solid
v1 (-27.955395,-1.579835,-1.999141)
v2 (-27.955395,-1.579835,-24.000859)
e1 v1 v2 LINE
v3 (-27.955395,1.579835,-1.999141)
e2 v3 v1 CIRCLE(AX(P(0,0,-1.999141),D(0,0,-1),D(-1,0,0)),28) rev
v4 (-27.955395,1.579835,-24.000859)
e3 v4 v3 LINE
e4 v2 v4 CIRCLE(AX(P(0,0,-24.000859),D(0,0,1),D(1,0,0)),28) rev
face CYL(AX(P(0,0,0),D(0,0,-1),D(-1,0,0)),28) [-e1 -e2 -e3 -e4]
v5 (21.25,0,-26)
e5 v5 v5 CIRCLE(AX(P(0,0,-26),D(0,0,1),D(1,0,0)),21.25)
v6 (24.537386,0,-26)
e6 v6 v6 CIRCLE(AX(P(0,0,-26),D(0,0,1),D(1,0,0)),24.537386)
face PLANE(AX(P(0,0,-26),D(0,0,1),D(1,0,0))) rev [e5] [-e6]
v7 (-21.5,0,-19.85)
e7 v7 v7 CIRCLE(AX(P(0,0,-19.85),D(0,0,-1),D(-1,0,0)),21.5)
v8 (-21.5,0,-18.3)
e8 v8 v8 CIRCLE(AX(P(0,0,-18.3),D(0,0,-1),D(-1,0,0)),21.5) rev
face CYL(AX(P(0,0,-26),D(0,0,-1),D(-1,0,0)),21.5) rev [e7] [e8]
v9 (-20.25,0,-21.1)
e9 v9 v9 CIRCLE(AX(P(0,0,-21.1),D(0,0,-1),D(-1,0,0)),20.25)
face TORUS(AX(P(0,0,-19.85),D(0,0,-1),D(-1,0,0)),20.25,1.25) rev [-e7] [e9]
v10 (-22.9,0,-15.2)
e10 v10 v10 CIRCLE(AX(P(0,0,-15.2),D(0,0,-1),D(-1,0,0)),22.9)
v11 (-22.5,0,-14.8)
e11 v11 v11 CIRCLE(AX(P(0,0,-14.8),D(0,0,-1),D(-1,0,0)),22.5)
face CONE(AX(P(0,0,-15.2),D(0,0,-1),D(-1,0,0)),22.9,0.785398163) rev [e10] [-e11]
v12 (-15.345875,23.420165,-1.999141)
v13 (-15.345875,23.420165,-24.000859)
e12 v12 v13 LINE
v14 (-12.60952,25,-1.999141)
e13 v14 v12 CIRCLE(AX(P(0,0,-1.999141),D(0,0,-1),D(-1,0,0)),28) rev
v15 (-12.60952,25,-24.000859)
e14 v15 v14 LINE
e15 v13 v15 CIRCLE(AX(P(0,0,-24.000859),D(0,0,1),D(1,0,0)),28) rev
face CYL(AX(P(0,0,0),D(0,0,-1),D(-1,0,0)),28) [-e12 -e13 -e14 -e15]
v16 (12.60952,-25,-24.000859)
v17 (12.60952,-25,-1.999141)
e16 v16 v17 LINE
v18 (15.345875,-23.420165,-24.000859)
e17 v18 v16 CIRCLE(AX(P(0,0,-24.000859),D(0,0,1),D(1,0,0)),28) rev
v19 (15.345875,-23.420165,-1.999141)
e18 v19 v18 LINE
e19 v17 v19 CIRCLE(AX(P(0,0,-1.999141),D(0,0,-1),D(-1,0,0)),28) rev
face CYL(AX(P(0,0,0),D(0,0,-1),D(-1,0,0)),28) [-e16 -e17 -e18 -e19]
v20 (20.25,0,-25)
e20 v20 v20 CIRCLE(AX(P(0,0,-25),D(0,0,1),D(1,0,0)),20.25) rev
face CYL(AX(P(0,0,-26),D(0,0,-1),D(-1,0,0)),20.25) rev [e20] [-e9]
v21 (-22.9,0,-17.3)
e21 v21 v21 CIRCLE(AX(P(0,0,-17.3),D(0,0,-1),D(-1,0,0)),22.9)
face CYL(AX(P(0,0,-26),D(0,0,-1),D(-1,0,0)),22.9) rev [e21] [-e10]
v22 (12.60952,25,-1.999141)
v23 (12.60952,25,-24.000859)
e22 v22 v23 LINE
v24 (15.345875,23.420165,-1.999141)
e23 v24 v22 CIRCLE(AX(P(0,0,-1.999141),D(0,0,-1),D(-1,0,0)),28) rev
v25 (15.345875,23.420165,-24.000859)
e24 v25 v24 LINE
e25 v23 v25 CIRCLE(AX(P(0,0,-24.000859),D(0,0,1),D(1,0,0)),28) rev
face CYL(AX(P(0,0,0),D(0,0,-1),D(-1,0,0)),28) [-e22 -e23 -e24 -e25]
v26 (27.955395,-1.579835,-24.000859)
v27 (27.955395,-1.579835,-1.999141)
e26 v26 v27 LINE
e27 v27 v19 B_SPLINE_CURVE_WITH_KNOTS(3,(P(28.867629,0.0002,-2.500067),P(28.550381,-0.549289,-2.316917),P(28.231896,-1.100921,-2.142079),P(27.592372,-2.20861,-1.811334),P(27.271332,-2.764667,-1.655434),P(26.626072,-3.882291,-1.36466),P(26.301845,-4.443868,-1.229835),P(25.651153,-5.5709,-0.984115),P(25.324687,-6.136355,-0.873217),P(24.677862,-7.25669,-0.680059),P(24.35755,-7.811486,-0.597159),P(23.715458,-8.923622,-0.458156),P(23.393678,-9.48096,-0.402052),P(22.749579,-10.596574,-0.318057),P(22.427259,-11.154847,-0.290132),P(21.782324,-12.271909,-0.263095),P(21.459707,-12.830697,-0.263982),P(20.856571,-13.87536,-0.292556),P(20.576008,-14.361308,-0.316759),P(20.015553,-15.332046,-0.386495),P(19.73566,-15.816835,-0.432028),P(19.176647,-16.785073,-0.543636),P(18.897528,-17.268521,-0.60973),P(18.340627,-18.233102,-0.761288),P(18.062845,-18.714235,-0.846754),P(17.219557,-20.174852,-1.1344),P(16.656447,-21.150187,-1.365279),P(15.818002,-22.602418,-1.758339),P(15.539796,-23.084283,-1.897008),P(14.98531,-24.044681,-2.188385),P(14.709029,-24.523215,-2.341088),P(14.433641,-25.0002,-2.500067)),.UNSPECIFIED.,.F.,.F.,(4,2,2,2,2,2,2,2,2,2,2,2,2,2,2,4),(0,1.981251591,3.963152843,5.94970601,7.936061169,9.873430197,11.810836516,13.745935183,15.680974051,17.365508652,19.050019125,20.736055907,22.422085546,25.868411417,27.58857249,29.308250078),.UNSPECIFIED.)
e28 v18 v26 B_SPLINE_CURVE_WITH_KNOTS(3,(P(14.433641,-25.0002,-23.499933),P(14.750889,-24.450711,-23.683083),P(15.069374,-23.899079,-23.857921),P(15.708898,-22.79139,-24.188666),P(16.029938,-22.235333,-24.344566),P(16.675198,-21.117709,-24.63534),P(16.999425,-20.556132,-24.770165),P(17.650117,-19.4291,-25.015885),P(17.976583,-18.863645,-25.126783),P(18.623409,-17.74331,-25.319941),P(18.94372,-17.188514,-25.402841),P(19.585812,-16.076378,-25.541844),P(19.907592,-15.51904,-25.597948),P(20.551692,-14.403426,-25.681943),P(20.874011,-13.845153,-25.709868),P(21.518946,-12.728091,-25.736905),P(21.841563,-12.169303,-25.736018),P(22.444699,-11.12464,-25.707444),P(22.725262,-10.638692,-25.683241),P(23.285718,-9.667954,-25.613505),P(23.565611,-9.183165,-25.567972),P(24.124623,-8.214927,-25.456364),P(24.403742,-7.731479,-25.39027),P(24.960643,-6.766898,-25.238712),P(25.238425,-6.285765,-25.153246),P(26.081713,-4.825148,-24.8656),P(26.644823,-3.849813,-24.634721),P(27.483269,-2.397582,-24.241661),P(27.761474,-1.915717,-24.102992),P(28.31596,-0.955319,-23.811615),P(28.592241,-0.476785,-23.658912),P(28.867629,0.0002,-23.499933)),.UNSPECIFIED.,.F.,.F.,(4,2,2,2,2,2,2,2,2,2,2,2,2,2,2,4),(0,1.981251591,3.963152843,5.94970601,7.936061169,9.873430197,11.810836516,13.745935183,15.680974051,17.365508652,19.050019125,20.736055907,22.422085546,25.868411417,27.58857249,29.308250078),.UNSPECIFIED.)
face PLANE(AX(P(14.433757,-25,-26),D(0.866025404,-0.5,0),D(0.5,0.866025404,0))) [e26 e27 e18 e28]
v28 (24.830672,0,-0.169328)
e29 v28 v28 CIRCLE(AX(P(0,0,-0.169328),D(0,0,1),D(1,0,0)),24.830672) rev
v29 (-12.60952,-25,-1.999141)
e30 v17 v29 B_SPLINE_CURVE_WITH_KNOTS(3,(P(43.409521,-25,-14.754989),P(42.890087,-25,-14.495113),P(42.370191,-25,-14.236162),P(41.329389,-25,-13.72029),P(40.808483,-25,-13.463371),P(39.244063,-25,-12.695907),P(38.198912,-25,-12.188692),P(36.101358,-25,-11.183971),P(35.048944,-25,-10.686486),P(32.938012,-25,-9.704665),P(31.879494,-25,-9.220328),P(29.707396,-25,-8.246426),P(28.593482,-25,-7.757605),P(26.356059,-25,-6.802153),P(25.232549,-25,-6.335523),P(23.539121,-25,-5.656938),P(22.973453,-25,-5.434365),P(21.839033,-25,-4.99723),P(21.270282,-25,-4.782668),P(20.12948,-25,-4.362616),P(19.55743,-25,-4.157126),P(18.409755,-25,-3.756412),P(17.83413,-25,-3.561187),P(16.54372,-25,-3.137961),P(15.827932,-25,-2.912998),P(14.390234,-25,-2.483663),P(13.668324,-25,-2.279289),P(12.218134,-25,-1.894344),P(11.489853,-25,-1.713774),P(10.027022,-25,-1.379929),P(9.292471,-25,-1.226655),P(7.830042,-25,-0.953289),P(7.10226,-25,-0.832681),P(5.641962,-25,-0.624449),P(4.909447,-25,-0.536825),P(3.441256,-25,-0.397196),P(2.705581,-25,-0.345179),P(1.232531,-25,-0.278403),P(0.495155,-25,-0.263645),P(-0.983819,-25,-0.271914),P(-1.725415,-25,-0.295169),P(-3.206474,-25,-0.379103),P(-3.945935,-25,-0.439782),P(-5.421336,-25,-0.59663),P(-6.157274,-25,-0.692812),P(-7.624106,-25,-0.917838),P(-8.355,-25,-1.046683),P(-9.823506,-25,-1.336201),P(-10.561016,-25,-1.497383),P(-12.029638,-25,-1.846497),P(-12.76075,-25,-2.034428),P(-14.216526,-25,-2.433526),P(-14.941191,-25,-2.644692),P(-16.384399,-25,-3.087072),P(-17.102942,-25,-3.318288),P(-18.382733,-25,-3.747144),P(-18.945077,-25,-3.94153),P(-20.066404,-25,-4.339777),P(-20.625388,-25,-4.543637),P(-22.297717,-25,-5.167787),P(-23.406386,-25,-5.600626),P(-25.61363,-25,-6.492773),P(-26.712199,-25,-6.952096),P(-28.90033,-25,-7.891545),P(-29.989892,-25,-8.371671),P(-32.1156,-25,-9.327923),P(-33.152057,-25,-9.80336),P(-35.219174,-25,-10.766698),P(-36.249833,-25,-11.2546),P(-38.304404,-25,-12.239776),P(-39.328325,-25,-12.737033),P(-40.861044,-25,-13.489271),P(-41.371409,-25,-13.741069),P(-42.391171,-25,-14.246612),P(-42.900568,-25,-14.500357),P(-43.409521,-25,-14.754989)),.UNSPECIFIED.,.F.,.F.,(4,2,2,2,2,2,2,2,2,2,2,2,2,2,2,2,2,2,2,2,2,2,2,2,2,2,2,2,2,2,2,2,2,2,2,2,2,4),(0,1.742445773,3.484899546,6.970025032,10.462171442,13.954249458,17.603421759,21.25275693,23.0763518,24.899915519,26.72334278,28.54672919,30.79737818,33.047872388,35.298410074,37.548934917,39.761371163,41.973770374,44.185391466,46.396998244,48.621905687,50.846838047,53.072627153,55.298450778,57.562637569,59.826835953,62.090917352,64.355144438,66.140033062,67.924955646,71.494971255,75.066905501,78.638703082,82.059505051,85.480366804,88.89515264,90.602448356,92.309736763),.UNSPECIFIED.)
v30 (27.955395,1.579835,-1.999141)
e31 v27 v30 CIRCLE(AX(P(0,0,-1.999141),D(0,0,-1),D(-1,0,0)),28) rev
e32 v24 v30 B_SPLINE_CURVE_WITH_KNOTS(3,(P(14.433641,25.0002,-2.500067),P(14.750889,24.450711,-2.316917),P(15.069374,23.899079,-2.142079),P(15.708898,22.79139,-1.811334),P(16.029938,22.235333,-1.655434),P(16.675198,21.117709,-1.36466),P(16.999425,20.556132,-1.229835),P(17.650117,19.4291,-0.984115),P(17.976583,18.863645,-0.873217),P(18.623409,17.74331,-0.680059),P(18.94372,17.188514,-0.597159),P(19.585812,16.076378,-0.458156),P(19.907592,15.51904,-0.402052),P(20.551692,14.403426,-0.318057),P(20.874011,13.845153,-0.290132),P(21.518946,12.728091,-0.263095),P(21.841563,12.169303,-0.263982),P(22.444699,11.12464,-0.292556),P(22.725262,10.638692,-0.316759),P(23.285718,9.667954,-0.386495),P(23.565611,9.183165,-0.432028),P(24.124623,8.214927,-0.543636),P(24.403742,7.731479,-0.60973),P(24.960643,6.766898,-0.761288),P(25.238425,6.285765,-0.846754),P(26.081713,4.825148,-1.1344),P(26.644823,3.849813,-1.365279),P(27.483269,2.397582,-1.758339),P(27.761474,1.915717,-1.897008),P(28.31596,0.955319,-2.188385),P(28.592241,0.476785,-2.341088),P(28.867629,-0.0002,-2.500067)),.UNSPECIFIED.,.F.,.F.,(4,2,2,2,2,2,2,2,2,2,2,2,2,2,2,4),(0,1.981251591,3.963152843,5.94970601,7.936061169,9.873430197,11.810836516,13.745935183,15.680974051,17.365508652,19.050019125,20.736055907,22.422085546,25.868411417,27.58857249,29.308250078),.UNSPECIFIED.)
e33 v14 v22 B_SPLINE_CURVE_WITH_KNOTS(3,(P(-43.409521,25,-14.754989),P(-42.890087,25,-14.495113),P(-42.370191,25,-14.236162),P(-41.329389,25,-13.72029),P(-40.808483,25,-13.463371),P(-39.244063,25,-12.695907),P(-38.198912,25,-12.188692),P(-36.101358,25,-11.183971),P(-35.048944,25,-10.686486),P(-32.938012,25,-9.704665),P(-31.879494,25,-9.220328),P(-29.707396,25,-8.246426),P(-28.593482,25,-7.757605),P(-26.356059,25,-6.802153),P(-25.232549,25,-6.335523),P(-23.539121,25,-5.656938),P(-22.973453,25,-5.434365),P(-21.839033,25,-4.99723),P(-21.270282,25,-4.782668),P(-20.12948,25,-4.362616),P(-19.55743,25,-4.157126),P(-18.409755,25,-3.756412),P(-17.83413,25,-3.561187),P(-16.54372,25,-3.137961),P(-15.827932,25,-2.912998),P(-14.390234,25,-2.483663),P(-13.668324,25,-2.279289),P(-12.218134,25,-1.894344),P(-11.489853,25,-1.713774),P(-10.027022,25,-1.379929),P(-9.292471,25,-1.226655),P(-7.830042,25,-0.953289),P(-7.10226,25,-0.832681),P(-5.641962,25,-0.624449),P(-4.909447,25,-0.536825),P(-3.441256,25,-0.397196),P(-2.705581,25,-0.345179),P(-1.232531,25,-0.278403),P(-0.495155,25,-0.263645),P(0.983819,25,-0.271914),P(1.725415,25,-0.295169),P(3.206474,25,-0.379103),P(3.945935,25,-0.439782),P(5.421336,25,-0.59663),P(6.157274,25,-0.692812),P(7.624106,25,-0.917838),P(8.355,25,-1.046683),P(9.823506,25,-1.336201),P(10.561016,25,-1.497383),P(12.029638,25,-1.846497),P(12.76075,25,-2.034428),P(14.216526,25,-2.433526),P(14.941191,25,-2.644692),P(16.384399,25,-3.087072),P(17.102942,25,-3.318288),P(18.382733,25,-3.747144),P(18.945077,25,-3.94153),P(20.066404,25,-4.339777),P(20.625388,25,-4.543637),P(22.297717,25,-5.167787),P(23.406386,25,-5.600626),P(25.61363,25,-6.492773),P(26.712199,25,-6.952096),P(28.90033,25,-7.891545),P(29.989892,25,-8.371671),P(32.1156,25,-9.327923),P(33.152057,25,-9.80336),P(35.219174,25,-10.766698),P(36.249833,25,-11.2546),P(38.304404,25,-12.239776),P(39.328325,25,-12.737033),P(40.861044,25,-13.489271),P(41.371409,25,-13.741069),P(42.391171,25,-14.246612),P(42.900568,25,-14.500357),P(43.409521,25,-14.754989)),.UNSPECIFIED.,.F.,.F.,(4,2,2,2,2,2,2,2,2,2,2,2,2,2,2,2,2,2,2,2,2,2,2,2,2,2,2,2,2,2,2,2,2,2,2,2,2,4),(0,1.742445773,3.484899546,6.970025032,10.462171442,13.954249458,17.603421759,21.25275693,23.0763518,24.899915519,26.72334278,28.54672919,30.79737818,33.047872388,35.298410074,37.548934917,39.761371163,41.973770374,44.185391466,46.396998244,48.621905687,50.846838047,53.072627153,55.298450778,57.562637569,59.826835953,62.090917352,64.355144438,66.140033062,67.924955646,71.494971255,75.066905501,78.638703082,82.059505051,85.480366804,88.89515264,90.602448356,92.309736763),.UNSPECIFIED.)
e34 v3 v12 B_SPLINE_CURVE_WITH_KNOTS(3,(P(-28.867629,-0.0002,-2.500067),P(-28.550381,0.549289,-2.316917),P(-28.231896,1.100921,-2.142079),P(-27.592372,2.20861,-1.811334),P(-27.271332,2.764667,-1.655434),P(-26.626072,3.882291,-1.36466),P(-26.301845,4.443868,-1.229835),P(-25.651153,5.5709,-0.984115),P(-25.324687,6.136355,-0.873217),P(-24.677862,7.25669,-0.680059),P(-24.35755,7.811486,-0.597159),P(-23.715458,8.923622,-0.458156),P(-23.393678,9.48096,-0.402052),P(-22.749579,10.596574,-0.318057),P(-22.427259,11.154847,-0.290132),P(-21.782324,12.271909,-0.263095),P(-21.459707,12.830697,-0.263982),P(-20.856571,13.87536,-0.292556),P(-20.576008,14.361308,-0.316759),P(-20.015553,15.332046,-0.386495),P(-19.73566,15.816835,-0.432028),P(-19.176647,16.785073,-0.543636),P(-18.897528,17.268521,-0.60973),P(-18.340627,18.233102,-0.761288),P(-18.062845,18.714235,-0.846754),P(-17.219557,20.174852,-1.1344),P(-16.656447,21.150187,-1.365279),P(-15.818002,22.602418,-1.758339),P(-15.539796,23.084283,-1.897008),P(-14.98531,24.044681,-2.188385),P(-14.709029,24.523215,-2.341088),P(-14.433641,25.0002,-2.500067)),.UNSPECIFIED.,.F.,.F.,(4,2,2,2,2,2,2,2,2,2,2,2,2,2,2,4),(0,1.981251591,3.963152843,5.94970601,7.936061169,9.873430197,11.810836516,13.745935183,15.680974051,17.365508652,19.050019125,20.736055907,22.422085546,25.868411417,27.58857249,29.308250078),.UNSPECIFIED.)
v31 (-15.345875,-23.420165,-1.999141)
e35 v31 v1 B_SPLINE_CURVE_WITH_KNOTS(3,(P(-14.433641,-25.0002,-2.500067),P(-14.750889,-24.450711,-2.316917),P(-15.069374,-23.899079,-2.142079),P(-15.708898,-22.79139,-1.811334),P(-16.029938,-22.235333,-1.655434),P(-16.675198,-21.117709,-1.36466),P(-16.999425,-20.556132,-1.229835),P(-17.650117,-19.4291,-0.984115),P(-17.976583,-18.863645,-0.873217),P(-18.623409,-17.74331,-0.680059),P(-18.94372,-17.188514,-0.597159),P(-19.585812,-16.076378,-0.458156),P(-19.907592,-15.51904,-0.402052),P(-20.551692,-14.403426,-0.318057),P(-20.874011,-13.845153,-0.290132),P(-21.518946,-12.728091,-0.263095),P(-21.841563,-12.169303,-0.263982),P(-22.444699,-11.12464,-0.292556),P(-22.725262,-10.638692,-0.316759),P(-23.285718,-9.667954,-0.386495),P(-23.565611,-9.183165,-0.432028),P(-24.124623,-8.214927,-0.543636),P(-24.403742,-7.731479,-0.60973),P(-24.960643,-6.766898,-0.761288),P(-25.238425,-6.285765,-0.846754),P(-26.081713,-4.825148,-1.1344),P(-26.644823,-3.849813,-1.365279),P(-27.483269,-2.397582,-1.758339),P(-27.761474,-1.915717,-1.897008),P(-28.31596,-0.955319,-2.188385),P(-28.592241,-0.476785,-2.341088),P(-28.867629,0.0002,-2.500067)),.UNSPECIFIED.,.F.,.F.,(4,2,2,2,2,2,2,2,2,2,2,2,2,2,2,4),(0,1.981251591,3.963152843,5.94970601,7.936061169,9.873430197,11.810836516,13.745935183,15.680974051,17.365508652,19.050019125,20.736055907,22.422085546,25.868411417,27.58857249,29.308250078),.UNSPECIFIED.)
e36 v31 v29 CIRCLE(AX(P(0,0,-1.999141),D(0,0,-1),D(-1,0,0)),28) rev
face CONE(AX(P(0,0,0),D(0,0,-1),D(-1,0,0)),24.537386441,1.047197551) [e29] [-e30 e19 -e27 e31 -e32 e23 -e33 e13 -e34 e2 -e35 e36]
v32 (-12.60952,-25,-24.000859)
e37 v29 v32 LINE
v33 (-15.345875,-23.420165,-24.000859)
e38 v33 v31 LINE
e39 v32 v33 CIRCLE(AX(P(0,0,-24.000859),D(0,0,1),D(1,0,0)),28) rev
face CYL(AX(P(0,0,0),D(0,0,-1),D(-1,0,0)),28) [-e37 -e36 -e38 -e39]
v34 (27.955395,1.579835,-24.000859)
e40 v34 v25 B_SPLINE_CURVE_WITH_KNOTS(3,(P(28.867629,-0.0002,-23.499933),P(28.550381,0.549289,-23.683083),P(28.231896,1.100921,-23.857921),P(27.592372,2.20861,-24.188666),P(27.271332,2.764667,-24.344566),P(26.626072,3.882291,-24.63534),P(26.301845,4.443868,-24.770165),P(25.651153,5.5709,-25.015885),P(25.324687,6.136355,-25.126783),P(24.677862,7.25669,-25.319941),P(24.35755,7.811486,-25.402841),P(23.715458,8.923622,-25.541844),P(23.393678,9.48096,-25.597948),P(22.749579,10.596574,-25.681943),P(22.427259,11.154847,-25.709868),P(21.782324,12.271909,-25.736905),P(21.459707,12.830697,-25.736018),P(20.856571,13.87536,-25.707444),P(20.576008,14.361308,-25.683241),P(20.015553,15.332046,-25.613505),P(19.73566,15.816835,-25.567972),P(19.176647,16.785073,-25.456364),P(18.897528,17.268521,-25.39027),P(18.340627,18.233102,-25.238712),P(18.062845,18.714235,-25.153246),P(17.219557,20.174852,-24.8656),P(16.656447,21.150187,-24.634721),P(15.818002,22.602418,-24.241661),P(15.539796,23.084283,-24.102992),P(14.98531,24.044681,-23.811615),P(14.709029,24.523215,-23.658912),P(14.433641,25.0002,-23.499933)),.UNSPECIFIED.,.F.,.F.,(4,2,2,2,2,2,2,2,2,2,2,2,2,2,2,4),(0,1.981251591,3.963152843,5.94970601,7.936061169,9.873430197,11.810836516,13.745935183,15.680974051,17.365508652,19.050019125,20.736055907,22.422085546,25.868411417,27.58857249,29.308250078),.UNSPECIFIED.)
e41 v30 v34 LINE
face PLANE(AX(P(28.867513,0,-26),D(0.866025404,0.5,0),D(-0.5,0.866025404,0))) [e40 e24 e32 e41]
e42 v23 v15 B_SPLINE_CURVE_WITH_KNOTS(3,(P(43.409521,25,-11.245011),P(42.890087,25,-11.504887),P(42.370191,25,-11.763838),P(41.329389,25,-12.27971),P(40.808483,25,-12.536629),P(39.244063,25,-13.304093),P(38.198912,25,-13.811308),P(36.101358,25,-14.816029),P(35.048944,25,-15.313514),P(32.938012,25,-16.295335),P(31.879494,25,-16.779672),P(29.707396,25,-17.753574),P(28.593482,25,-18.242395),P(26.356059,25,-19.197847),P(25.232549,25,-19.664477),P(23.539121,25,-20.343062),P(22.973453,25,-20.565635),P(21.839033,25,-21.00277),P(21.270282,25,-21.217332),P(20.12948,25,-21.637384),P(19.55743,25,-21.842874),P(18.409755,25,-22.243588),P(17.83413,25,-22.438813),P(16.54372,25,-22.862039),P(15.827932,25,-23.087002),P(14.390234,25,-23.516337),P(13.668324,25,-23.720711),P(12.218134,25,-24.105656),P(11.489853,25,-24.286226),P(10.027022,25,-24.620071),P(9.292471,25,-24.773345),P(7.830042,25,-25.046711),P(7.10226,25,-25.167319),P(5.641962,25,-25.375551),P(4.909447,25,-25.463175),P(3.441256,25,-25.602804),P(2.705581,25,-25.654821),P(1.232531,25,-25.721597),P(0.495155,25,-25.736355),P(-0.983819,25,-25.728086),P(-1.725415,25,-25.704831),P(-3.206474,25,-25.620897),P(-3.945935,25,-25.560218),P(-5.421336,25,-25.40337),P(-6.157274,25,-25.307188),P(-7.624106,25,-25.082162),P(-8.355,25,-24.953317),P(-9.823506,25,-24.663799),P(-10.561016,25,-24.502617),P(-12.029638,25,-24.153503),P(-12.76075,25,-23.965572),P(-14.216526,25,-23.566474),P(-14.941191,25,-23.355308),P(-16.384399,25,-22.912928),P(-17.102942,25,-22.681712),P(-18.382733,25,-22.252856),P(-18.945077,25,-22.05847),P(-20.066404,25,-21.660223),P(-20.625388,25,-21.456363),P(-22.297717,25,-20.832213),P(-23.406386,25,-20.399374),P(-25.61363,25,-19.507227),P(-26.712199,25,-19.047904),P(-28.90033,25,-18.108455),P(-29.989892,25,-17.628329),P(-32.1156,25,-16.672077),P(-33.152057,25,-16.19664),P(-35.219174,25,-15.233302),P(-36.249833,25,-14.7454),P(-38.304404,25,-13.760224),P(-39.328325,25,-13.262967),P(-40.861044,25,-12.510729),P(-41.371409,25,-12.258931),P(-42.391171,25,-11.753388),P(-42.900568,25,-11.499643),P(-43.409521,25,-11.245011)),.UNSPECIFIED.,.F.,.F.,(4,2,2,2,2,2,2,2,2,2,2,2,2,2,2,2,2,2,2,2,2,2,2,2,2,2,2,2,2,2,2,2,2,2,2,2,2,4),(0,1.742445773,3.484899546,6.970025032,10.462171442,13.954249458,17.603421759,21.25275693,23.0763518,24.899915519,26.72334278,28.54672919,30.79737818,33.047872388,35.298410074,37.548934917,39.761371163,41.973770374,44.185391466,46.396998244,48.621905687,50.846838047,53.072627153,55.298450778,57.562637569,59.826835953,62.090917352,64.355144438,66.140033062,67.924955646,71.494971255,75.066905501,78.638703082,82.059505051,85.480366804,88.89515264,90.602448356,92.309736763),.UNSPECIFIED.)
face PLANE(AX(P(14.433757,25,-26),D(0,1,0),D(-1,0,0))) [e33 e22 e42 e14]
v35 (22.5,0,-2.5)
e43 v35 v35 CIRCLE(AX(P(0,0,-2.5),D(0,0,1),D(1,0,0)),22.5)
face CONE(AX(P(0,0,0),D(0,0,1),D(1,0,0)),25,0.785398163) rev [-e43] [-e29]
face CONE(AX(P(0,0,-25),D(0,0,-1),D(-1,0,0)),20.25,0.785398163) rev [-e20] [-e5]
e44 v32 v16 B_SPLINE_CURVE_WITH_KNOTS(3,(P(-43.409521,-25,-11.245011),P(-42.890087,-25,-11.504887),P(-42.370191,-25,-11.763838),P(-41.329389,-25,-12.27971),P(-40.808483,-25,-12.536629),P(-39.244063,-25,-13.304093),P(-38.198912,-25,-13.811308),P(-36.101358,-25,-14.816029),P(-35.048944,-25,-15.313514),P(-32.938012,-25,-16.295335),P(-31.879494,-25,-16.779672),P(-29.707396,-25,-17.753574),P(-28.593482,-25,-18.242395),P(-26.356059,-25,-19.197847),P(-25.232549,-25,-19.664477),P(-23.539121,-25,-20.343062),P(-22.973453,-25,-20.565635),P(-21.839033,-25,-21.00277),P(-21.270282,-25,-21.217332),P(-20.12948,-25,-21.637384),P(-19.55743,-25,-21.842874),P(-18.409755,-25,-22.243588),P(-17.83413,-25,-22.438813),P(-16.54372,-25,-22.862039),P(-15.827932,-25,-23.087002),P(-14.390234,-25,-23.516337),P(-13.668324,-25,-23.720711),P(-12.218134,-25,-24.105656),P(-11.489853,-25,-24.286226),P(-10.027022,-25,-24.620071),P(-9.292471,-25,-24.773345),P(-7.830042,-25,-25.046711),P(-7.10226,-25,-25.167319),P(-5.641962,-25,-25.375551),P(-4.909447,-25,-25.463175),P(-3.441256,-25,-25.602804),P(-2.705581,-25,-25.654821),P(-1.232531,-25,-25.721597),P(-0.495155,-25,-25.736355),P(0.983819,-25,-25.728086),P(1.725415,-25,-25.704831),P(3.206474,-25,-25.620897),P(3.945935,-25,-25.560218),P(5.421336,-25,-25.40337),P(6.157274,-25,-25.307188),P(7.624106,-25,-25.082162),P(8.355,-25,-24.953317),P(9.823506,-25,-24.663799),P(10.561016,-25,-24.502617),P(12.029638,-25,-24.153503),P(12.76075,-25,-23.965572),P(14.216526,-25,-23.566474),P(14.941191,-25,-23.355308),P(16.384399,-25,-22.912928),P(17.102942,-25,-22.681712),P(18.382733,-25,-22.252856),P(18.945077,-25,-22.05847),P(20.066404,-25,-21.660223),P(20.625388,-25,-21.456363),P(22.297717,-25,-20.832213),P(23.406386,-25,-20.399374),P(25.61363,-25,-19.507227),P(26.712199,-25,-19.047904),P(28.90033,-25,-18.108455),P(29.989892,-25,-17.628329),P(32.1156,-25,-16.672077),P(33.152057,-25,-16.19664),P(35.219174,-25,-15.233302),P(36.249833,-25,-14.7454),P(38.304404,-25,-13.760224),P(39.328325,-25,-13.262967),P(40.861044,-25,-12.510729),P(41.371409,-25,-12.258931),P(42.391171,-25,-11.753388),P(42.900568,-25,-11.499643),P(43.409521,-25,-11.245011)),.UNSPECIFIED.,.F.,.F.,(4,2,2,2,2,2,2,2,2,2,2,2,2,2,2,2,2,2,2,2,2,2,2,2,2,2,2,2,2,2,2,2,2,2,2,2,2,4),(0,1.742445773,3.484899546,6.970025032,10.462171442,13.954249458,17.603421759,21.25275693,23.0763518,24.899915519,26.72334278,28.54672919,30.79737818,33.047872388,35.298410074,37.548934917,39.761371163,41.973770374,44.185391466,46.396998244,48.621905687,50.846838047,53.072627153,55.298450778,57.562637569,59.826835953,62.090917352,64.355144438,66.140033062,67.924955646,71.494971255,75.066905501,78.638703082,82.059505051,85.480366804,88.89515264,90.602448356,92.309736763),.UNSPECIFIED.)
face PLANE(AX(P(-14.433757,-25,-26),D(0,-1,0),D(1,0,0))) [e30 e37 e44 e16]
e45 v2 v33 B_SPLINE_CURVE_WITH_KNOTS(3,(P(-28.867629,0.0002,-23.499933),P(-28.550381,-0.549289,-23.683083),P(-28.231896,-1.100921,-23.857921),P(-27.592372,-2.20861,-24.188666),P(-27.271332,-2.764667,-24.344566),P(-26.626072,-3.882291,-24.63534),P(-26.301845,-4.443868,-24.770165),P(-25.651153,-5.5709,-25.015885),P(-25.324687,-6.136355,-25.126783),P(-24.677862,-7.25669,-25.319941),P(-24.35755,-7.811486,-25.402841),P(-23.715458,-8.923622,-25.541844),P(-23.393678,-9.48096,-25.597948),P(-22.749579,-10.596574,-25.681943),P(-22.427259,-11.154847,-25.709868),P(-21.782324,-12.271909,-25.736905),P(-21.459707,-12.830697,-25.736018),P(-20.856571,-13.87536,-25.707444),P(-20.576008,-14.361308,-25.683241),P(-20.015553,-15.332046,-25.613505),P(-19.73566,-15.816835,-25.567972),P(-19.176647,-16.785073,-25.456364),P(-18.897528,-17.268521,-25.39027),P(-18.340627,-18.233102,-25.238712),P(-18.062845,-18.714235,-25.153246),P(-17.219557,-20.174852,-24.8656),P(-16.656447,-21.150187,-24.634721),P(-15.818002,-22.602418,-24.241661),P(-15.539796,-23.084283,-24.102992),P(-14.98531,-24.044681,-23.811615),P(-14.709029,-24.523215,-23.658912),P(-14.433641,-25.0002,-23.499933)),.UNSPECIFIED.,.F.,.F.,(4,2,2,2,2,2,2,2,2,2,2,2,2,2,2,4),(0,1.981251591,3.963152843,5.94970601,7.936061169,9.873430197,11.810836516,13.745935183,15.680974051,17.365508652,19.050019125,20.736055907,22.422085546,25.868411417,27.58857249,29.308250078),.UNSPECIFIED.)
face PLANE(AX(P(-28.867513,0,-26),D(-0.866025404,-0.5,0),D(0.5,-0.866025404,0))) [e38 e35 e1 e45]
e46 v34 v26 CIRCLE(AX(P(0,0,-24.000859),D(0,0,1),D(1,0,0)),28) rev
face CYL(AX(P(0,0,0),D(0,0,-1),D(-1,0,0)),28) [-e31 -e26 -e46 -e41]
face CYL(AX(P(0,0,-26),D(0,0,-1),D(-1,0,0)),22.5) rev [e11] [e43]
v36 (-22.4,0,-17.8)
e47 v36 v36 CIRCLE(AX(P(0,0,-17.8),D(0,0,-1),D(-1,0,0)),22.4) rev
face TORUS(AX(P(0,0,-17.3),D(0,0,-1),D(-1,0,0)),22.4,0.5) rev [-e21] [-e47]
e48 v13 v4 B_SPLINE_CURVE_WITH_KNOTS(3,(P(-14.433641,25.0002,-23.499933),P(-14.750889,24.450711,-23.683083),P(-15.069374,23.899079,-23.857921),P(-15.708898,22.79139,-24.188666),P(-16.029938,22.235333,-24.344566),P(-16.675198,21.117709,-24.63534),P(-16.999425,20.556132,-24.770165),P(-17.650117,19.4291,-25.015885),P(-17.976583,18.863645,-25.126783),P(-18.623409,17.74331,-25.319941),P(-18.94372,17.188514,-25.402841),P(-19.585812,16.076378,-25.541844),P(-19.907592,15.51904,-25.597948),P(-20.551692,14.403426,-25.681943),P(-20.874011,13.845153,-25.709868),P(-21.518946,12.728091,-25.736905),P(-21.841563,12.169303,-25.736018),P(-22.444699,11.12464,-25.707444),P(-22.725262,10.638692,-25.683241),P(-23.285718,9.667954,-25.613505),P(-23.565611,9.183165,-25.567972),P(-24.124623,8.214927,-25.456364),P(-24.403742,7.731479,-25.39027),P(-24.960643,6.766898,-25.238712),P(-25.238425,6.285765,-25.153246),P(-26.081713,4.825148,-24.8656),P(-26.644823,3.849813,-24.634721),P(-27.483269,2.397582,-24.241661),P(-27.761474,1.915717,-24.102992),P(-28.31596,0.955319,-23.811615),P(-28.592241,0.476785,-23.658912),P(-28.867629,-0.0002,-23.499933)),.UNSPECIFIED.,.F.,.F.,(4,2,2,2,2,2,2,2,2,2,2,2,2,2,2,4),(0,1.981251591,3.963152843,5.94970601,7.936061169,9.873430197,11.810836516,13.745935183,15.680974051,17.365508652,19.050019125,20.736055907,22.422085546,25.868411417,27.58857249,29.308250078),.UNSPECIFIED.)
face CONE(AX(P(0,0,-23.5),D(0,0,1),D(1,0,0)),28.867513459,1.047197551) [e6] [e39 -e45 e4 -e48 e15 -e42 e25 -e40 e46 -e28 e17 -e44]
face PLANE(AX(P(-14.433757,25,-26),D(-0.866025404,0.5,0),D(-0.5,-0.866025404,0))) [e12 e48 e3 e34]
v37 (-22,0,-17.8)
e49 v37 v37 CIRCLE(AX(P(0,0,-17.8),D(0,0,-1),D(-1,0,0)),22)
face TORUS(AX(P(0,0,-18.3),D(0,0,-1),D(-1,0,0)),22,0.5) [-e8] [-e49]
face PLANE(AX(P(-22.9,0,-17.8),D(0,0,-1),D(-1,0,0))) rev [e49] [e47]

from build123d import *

# Parameters (mm, degrees)
EXTRUDE_1_DEPTH     = 26
FILLET_1_R          = 1.25
SKETCH_17_R         = 22.5
SKETCH_17_R_2       = 21.415
EXTRUDE_2_DEPTH     = 1.5
CHAMFER_1_SIZE      = 1.5
SKETCH_18_R         = 28.867513459
CUT_EXTRUDE_2_DEPTH = 47.198845585
FILLET_2_R          = 0.5
CHAMFER_2_SIZE      = 1
SKETCH_19_OUTSIDE_W = 75.872
SKETCH_19_OUTSIDE_H = 68.136
SKETCH_19_OUTSIDE_R = 28
CUT_EXTRUDE_4_DEPTH = 47.198845585
CHAMFER_3_SIZE      = 2.5


# Some blends are built 0.0001 mm under size
with BuildPart() as part:
    # Эскиз1 → Бобышка-Вытянуть1 (new body)
    with BuildSketch(Plane.XY):
        Polygon((28.867513459, 0), (14.43375673, 25), (-14.43375673, 25), (-28.867513459, 0), (-14.43375673, -25), (14.43375673, -25), align=None)
    extrude(amount=-EXTRUDE_1_DEPTH)

    # Sketch 4 → Вырез-Повернуть1 (revolve, cut)
    with BuildSketch(Plane(origin=(0, 0, 0), x_dir=(1, 0, 0), z_dir=(0, 1, 0)), mode=Mode.PRIVATE) as cut_revolve_1_sk:
        Polygon((-28.867513459, 26), (-28.867513459, 23.5), (-24.537386441, 26), align=None)
        Polygon((-28.867513459, 0), (-28.867513459, 2.5), (-24.537386441, 0), align=None)
    revolve(cut_revolve_1_sk.sketch.rotate(Axis((0, 0, 0), (0, 0, -1)), 180.000000003), axis=Axis((0, 0, 0), (0, 0, -1)), mode=Mode.SUBTRACT)

    # Эскиз5 → Вырез-Повернуть2 (revolve, cut)
    with BuildSketch(Plane(origin=(0, 0, 0), x_dir=(1, 0, 0), z_dir=(0, 1, 0))):
        Polygon((0, 0), (-22.5, 0), (-22.5, 14.8), (-22.9, 15.2), (-22.9, 17.8), (-21.5, 17.8), (-21.5, 21.1), (-20.25, 21.1), (-20.25, 26), (0, 26), align=None)
    revolve(axis=Axis((0, 0, -26), (0, 0, 1)), mode=Mode.SUBTRACT)

    # Скругление1
    fillet_1_edges = [part.edges().sort_by_distance(p)[0] for p in [
        (21.5, 0, -21.1),
    ]]
    fillet(fillet_1_edges, radius=FILLET_1_R - 0.0001)  # a hair under: the kernel refuses the full size

    # Скругление2
    fillet_2_edges = [part.edges().sort_by_distance(p)[0] for p in [
        (22.9, 0, -17.8),
        (21.5, 0, -17.8),
    ]]
    fillet(fillet_2_edges, radius=FILLET_2_R)

    # Фаска2
    chamfer_2_edges = [part.edges().sort_by_distance(p)[0] for p in [
        (20.25, 0, -26),
    ]]
    chamfer(chamfer_2_edges, length=CHAMFER_2_SIZE)

    # Эскиз19 outside → Вырез-Вытянуть4 (cut, through all)
    with BuildSketch(Plane(origin=(0, 0, -26), x_dir=(-1, 0, 0), z_dir=(0, 0, -1))):
        Rectangle(SKETCH_19_OUTSIDE_W, SKETCH_19_OUTSIDE_H)
        Circle(SKETCH_19_OUTSIDE_R, mode=Mode.SUBTRACT)
    extrude(amount=-CUT_EXTRUDE_4_DEPTH, mode=Mode.SUBTRACT)

    # Фаска3
    # the kernel refuses this chamfer: 2.5 mm, written as the material it takes off along each edge
    with BuildSketch(Plane(origin=(0, 0, 0), x_dir=(-1, 0, 0), z_dir=(0, 1, 0))) as chamfer_3_piece_1:
        Polygon((22.5, -CHAMFER_3_SIZE), (22.5 + CHAMFER_3_SIZE, 0), (22.5, 0), align=None)
    revolve(axis=Axis((0, 0, 0), (0, 0, 1)), mode=Mode.SUBTRACT)


with BuildPart() as body_2:
    # Эскиз17 → Бобышка-Вытянуть2 (new body)
    with BuildSketch(Plane.XY):
        with Locations(Location((0, 0, 0), (0, 0, 180))):
            Circle(SKETCH_17_R)
        Circle(SKETCH_17_R_2, mode=Mode.SUBTRACT)
    extrude(amount=EXTRUDE_2_DEPTH)

    # Фаска1
    # the kernel refuses this chamfer: 1.5 mm, written as the material it takes off along each edge
    with BuildSketch(Plane(origin=(0, 0, 1.5), x_dir=(1, 0, 0), z_dir=(0, -1, 0))) as chamfer_1_piece_1:
        Polygon((21.415, -CHAMFER_1_SIZE), (21.415 + CHAMFER_1_SIZE, 0), (21.415, 0), align=None)
    revolve(axis=Axis((0, 0, 1.5), (0, 0, 1)), mode=Mode.SUBTRACT)

    # Эскиз18 → Вырез-Вытянуть2 (cut, through all)
    with BuildSketch(Plane.XY):
        Circle(SKETCH_18_R)
    extrude(amount=CUT_EXTRUDE_2_DEPTH, mode=Mode.SUBTRACT)


solid = part.part
